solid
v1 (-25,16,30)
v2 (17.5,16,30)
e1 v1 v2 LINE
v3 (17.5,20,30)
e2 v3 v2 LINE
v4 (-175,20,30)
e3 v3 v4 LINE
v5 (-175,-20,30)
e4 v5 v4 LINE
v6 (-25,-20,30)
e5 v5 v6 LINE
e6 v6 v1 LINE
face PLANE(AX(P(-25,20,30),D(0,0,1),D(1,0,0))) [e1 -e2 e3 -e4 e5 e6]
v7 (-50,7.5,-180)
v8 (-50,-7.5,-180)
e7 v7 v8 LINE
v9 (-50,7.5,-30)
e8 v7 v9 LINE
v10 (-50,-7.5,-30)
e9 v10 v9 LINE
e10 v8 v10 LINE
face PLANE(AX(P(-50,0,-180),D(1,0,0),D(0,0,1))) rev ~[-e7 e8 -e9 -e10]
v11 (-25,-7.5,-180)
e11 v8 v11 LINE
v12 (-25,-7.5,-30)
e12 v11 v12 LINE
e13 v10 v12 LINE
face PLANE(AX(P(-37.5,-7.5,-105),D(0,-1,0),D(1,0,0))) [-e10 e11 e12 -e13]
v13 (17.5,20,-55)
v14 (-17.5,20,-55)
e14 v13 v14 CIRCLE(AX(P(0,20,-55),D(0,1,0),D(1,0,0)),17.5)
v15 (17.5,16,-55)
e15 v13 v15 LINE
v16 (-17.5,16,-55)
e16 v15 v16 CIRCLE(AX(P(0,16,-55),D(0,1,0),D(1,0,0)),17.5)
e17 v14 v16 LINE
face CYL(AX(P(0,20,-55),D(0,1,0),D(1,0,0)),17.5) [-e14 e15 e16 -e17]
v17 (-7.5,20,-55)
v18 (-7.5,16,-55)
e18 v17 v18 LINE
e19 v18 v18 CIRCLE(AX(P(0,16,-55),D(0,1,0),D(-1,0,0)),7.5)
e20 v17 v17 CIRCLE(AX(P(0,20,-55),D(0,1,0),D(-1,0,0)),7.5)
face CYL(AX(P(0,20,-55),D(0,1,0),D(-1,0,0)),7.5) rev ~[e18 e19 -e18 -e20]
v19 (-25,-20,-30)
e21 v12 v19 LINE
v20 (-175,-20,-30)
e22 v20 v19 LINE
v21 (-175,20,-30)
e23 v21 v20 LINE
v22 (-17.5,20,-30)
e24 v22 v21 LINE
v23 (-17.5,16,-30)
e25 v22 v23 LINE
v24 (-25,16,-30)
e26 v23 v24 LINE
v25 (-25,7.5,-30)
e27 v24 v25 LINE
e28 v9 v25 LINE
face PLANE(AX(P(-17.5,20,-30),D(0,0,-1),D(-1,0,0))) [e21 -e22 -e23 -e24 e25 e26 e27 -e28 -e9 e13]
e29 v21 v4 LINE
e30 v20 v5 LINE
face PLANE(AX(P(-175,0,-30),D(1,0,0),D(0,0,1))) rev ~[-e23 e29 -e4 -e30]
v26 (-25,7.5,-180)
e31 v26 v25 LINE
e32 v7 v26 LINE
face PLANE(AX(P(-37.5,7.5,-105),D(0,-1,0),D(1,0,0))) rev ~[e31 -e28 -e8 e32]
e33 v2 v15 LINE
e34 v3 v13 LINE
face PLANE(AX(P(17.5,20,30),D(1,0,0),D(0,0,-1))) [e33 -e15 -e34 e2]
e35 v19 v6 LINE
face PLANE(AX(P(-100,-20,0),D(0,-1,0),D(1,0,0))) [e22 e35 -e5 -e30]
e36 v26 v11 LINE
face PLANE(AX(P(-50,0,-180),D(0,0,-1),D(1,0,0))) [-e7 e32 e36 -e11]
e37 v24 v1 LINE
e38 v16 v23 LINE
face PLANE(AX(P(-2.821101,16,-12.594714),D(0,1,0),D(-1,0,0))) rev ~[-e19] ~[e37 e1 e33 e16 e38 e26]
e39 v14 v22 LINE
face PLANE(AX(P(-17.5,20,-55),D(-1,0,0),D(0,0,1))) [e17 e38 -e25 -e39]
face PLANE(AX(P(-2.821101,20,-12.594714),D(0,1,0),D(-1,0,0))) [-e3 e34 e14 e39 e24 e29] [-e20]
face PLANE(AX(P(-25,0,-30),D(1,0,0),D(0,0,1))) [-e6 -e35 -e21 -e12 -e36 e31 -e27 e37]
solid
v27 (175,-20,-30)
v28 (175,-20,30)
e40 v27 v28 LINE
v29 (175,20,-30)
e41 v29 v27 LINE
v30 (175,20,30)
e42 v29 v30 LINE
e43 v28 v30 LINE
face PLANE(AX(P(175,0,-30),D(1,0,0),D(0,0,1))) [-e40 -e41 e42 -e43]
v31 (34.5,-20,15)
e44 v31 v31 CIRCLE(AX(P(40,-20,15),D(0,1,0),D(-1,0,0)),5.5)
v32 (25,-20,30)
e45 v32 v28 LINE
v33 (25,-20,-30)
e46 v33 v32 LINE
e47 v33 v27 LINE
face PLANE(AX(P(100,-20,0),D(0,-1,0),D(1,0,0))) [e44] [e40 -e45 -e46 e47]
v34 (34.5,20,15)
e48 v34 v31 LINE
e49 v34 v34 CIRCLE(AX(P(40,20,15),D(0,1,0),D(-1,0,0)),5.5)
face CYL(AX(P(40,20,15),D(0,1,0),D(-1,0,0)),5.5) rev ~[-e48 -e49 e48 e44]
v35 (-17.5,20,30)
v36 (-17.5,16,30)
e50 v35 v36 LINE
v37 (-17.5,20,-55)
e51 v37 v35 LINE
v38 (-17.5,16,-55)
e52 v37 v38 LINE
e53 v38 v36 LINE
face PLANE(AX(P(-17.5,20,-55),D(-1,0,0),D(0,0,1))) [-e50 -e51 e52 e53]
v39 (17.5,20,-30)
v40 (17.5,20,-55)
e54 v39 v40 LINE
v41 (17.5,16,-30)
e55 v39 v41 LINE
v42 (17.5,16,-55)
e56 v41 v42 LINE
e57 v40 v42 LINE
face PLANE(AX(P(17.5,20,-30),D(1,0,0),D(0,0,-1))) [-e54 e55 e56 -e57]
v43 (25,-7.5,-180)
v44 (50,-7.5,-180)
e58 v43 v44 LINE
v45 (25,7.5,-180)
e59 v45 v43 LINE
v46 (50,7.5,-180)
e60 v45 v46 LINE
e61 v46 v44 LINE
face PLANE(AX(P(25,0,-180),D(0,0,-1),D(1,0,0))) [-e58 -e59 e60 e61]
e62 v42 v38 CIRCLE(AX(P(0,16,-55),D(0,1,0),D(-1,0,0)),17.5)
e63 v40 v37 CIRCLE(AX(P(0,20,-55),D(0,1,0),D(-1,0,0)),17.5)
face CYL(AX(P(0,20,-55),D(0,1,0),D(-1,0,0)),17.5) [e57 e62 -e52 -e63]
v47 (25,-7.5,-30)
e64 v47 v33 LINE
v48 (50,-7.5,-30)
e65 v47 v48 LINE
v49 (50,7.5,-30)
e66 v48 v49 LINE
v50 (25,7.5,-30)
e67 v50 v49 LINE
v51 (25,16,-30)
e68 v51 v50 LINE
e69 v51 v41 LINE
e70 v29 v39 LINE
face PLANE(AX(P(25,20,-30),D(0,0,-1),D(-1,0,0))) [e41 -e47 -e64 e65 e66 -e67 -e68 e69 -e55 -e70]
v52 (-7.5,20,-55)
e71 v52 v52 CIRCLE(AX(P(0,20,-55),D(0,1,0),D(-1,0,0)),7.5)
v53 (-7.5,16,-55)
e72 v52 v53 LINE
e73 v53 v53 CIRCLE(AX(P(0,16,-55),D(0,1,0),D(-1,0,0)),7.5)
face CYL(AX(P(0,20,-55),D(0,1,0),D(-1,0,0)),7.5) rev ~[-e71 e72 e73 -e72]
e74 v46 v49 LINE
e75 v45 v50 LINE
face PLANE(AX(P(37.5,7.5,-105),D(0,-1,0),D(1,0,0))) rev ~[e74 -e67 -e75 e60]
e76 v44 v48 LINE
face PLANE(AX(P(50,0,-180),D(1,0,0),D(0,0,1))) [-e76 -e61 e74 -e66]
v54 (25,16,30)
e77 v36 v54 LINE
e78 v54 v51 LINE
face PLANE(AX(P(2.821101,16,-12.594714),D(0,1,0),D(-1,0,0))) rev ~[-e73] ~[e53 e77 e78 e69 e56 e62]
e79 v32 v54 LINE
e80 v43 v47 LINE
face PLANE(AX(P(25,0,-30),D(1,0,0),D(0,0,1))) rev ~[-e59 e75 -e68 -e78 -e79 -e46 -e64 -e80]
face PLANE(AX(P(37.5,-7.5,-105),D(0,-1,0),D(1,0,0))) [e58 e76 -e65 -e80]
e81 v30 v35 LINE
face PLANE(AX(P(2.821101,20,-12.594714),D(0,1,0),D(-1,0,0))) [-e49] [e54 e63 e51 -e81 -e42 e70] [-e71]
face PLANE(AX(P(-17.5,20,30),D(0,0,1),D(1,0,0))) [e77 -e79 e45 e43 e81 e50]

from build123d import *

# Parameters (mm, degrees)
F0_W     = 150
F0_H     = 60
F1_DEPTH = 20
F2_W     = 25
F2_H     = 150
F3_DEPTH = 7.5
F4_R     = 7.5
F5_DEPTH = 4
F6_R     = 5.5
F7_DEPTH = 40.001
F8_R     = 7.5
F9_DEPTH = 4


with BuildPart() as f1:
    # F0 (on Front) → F1 (new body, symmetric)
    with BuildSketch(Plane.XZ):
        with Locations((100, 0)):
            Rectangle(F0_W, F0_H)
    extrude(amount=F1_DEPTH, both=True)

    # F2 (on Front) → F3, piece 2 (join, symmetric)
    with BuildSketch(Plane.XZ):
        with Locations((37.5, -105)):
            Rectangle(F2_W, F2_H)
    extrude(amount=F3_DEPTH, both=True)

    # F6 (on face) → F7 (cut, through all)
    with BuildSketch(Plane(origin=(0, 20, 0), x_dir=(-1, 0, 0), z_dir=(0, 1, 0))):
        with Locations((-40, 15)):
            Circle(F6_R)
    extrude(amount=-F7_DEPTH, mode=Mode.SUBTRACT)

    # F8 (on face) → F9 (join)
    with BuildSketch(Plane(origin=(0, 20, 0), x_dir=(-1, 0, 0), z_dir=(0, 1, 0))):
        with BuildLine():
            Line((-17.5, 30), (-25, 30))
            Line((-25, 30), (-25, -30))
            Line((-25, -30), (-17.5, -30))
            Line((-17.5, -30), (-17.5, -55))
            ThreePointArc((-17.5, -55), (0, -37.5), (17.5, -55))
            Line((17.5, -55), (17.5, 30))
            Line((17.5, 30), (-17.5, 30))
        make_face()
        with BuildLine():
            ThreePointArc((-17.5, -55), (0, -72.5), (17.5, -55))
            ThreePointArc((17.5, -55), (0, -37.5), (-17.5, -55))
        make_face()
        with Locations((0, -55)):
            Circle(F8_R, mode=Mode.SUBTRACT)
    extrude(amount=-F9_DEPTH)


with BuildPart() as f1b:
    # F0 (on Front) → F1, piece 2 (new body, symmetric)
    with BuildSketch(Plane.XZ):
        with Locations((-100, 0)):
            Rectangle(F0_W, F0_H)
    extrude(amount=F1_DEPTH, both=True)

    # F2 (on Front) → F3 (join, symmetric)
    with BuildSketch(Plane.XZ):
        with Locations((-37.5, -105)):
            Rectangle(F2_W, F2_H)
    extrude(amount=F3_DEPTH, both=True)

    # F4 (on face) → F5 (join)
    with BuildSketch(Plane(origin=(0, 20, 0), x_dir=(-1, 0, 0), z_dir=(0, 1, 0))):
        with BuildLine():
            Line((25, 30), (17.5, 30))
            Line((17.5, 30), (-17.5, 30))
            Line((-17.5, 30), (-17.5, -55))
            ThreePointArc((-17.5, -55), (0, -37.5), (17.5, -55))
            Line((17.5, -55), (17.5, -30))
            Line((17.5, -30), (25, -30))
            Line((25, -30), (25, 30))
        make_face()
        with BuildLine():
            ThreePointArc((17.5, -55), (0, -37.5), (-17.5, -55))
            ThreePointArc((-17.5, -55), (0, -72.5), (17.5, -55))
        make_face()
        with Locations((0, -55)):
            Circle(F4_R, mode=Mode.SUBTRACT)
    extrude(amount=-F5_DEPTH)


solid = Compound([f1.part, f1b.part])
